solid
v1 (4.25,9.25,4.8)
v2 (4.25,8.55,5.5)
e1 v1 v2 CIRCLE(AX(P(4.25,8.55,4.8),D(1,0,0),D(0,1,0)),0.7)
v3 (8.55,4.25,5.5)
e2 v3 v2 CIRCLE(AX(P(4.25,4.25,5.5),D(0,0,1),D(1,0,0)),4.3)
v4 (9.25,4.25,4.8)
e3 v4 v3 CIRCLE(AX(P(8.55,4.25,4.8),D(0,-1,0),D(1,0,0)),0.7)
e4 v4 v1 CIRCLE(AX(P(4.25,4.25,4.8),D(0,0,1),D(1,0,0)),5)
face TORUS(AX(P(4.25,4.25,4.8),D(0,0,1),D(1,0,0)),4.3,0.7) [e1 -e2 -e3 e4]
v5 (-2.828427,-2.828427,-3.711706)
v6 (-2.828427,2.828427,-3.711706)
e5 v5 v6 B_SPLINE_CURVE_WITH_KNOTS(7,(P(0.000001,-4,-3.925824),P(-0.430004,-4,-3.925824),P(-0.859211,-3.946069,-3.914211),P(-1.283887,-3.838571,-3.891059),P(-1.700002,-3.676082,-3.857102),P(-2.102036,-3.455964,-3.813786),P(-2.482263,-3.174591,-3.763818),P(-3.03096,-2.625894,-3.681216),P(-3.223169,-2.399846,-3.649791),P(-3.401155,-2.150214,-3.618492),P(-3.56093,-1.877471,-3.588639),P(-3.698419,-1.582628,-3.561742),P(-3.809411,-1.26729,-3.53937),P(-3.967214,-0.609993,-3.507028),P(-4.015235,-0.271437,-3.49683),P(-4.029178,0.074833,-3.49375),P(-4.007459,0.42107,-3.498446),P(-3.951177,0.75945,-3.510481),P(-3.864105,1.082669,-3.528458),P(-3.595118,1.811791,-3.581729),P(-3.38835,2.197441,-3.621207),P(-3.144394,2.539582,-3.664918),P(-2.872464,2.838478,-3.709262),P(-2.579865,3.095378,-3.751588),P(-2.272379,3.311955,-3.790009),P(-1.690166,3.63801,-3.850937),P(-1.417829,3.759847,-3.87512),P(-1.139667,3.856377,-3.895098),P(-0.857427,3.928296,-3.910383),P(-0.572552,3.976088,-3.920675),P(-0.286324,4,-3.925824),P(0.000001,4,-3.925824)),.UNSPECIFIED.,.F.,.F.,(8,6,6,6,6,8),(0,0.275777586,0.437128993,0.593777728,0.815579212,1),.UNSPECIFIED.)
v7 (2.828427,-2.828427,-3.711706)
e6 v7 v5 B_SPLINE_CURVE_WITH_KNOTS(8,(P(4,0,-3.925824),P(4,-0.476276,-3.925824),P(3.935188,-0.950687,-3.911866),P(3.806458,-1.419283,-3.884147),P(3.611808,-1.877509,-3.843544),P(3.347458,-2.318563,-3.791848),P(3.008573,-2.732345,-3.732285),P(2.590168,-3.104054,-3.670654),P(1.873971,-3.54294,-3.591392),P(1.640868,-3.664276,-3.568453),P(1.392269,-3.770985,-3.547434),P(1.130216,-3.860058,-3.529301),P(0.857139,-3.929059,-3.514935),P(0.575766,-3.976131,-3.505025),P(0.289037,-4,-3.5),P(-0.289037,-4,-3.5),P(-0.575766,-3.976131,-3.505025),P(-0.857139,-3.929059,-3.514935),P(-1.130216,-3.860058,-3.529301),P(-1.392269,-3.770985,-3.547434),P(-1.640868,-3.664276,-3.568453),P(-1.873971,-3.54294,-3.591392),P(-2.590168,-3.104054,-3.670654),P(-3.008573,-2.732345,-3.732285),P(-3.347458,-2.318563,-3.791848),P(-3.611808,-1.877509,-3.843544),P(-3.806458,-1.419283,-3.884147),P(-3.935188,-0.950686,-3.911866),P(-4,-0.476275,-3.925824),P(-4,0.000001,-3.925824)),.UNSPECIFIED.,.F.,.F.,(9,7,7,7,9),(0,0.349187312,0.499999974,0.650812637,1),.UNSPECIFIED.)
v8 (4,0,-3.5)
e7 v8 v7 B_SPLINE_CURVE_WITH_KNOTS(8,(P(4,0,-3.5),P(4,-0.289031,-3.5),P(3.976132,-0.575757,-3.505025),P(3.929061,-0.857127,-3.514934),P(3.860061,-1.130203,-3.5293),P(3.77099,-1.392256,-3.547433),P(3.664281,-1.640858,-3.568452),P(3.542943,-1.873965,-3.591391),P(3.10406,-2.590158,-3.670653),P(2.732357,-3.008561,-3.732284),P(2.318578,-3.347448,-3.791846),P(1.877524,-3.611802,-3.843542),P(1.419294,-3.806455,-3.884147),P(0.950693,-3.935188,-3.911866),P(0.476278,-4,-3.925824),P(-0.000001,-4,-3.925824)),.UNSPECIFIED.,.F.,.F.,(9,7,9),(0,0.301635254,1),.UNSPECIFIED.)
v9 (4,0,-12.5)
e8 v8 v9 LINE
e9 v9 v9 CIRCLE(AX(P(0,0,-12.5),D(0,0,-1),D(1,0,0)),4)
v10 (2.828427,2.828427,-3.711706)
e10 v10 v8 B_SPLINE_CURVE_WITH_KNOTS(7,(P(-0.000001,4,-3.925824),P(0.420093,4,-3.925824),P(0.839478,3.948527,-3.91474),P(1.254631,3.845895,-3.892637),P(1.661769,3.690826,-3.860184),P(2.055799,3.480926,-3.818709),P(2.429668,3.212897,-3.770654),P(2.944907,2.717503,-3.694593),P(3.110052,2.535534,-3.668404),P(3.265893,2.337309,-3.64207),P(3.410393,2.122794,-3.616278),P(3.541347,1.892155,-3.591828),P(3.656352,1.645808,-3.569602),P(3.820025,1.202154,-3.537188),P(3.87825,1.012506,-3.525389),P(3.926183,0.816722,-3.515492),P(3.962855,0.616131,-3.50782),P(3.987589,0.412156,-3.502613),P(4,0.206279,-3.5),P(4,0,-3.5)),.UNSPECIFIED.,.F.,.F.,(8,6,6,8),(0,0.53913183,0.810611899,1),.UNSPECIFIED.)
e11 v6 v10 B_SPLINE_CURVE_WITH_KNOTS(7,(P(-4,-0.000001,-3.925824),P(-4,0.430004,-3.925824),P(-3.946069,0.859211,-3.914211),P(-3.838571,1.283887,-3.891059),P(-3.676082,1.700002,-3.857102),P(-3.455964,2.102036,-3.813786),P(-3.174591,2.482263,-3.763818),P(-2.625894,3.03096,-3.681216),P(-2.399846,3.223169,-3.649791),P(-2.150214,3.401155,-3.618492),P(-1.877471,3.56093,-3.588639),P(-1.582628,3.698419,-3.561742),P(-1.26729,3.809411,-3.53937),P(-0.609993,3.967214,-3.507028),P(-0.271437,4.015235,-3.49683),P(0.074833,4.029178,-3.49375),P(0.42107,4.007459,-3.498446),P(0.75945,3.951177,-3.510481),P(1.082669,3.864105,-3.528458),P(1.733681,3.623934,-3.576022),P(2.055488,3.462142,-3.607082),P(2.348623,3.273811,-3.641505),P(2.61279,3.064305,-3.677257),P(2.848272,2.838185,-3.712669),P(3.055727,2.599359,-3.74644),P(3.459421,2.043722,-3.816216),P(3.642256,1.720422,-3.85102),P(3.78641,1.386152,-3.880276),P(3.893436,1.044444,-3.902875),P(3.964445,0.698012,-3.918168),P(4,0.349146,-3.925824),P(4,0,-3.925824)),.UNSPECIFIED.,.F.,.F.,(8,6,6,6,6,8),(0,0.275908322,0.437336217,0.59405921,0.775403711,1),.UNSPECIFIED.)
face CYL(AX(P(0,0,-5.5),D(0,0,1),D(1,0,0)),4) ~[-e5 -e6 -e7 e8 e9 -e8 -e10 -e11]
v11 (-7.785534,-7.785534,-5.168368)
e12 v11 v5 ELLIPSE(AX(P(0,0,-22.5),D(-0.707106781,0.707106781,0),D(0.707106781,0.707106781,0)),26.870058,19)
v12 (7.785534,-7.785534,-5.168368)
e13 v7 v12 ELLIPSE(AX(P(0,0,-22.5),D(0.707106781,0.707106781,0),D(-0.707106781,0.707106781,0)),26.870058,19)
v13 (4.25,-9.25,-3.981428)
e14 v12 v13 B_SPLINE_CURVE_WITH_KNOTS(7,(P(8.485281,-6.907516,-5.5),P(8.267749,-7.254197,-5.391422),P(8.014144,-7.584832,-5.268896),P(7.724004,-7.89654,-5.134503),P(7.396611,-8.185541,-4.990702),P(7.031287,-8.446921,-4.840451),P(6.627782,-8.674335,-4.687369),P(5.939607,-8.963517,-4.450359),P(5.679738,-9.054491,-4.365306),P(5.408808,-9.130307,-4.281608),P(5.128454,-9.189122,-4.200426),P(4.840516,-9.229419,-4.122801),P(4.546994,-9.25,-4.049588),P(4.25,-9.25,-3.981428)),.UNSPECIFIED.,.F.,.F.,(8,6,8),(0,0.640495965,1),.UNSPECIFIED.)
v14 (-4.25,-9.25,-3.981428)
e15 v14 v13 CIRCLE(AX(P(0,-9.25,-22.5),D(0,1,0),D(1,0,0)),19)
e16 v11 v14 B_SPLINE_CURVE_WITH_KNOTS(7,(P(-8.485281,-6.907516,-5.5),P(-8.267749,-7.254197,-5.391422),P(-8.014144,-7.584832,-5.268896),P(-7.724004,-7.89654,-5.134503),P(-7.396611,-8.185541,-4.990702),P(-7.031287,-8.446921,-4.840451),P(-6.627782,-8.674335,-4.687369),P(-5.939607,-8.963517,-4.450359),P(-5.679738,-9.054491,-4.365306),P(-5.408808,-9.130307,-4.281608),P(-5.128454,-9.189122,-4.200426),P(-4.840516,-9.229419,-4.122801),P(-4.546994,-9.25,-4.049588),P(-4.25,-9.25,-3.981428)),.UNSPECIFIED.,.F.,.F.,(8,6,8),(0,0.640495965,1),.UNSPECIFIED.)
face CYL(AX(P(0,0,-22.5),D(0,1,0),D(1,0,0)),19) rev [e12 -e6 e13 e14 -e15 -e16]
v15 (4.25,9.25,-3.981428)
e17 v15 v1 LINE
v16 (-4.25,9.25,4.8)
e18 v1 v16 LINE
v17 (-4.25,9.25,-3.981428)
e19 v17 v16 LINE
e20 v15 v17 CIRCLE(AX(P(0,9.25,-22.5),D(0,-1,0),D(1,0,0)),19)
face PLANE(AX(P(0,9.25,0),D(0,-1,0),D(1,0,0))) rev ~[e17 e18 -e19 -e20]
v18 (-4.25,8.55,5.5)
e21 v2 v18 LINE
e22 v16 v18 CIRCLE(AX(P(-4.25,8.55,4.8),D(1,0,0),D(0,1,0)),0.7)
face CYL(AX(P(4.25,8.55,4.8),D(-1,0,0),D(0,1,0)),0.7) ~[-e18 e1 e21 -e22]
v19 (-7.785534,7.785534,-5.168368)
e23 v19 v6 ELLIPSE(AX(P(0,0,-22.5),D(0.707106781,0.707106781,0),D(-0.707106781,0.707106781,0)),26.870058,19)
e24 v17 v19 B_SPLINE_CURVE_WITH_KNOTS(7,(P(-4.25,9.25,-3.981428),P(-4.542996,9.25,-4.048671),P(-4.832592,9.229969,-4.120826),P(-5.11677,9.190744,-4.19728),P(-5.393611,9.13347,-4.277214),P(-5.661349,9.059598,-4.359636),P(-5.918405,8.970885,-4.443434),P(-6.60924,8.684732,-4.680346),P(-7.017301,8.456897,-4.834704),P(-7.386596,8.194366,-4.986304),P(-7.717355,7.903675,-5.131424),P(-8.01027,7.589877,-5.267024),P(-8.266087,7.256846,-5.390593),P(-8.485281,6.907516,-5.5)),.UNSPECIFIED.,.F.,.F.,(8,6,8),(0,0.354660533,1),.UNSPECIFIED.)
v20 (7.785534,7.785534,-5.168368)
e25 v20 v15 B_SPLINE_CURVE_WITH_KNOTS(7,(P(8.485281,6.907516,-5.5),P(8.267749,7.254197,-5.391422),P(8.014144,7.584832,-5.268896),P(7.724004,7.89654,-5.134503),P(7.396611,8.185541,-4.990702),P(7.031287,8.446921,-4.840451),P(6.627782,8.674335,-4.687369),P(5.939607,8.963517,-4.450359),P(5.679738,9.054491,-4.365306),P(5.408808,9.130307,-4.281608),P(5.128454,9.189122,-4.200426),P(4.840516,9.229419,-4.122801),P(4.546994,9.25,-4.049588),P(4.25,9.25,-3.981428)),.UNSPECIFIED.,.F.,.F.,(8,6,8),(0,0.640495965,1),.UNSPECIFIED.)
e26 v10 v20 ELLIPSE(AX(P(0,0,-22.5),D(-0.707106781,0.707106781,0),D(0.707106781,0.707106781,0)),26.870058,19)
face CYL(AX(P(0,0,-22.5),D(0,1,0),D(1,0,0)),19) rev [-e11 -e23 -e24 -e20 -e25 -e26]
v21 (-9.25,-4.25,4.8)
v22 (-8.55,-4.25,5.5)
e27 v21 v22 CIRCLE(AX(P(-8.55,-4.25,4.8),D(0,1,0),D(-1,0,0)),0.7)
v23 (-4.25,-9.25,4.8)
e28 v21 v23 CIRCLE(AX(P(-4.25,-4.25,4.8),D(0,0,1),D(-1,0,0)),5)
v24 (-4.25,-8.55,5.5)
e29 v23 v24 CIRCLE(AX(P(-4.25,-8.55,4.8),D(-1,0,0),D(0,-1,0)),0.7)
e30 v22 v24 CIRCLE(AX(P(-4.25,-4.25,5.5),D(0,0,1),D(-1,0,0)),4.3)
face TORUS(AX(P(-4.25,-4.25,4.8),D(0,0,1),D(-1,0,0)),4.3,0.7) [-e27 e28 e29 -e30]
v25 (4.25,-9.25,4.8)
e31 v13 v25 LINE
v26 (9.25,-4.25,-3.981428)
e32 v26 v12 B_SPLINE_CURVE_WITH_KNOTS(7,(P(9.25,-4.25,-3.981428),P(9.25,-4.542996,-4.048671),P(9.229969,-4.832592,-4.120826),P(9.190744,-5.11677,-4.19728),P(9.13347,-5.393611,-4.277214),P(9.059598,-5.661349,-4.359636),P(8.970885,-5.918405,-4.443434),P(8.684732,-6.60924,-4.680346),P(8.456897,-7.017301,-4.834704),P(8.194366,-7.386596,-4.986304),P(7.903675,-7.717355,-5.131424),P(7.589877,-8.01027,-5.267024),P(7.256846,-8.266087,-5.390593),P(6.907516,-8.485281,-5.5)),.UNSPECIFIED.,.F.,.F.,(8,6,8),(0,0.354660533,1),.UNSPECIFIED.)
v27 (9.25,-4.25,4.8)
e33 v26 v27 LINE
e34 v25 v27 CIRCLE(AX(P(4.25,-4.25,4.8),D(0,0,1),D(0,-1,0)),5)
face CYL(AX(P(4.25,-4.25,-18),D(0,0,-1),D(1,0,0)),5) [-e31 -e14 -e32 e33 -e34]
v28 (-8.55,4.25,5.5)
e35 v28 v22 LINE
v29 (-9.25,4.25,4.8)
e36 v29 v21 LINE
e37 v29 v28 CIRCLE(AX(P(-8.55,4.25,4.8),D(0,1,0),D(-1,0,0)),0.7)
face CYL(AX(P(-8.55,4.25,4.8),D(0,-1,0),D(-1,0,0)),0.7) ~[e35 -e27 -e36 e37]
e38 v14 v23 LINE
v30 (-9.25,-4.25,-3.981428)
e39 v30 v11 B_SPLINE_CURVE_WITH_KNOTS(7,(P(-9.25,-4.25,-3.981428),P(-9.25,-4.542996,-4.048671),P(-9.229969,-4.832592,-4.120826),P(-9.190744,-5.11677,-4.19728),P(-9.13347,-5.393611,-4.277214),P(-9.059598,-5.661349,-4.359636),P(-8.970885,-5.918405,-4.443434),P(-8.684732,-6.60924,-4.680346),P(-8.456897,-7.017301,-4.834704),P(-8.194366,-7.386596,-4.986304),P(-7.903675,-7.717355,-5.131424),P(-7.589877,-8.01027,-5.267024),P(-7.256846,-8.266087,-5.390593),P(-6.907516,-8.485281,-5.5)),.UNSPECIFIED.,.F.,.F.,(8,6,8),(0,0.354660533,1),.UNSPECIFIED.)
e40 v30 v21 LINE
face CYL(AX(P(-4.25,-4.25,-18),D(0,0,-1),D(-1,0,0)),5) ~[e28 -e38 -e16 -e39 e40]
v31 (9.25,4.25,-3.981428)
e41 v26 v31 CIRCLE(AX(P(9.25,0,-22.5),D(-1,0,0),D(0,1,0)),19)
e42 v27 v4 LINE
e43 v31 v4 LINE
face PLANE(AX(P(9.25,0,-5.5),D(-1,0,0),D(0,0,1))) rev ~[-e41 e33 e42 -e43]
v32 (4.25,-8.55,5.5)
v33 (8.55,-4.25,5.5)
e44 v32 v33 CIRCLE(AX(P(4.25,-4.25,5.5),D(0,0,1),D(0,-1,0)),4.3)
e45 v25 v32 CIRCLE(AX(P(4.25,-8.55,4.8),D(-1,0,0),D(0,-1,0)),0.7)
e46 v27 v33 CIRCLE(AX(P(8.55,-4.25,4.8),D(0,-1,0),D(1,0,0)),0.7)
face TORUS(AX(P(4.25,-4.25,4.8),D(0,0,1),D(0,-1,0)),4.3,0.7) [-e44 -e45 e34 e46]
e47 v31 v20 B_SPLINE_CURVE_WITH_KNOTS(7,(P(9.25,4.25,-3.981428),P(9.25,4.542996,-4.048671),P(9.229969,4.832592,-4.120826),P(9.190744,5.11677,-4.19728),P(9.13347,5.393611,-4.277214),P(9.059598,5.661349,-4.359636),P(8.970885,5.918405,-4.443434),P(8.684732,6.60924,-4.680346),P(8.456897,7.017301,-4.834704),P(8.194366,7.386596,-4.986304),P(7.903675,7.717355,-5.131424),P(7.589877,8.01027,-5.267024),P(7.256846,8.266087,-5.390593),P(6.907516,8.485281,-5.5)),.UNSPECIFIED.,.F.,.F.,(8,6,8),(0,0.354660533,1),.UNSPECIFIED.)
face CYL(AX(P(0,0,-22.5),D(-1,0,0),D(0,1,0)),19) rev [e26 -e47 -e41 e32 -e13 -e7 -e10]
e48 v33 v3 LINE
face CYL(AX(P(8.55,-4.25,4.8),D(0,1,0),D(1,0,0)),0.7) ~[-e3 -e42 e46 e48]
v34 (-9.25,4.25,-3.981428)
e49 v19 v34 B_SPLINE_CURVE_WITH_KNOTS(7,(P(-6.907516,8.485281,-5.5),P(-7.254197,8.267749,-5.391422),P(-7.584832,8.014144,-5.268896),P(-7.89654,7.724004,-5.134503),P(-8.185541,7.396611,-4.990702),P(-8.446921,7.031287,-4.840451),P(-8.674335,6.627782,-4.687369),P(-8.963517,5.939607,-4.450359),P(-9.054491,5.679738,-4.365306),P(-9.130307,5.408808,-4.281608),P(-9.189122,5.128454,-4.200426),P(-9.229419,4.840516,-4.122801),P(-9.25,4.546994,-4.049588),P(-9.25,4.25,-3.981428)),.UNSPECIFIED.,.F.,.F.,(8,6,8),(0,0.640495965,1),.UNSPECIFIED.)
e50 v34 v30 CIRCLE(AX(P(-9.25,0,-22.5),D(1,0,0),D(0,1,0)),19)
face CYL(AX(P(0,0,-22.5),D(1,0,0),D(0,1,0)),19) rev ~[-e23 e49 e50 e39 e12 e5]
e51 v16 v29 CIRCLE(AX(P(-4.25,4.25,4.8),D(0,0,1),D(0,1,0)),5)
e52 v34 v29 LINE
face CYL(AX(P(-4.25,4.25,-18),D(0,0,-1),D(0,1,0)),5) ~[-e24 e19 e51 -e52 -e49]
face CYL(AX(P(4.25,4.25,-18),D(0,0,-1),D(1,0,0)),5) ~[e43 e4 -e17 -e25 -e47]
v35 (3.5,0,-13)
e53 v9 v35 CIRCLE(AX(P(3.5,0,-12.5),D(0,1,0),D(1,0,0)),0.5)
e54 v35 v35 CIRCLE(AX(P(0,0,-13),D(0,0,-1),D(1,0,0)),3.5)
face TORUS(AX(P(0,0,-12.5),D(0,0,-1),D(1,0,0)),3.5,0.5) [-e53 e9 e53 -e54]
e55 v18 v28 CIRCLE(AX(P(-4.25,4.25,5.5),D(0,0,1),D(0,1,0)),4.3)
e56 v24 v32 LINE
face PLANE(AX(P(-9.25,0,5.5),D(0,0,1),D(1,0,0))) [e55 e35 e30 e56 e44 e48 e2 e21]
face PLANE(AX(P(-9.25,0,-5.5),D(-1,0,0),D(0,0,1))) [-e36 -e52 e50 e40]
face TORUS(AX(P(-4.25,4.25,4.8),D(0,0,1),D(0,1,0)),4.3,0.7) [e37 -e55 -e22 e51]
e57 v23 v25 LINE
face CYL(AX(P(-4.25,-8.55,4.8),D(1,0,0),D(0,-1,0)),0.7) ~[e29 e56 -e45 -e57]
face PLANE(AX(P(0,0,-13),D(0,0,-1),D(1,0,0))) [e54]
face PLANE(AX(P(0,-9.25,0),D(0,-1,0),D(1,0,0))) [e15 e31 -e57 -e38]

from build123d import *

# Parameters (mm, degrees)
F0_W         = 18.5
F0_H         = 11
F1_DEPTH     = 9.25
F2_DEPTH     = 9.25
F3_R         = 19
F5_DEPTH     = 25.4
F6_DEPTH     = 25.4
F4_R         = 19
F7_DEPTH     = 25.4
F8_DEPTH     = 25.4
F9_R         = 4
F10_DEPTH    = 3.45753
F11_DEPTH    = 7.5
F12_T1_DEPTH = 36
F13_R        = 0.7
F14_R        = 0.5


# Not quite as in the source:
# - a fillet or chamfer that OpenCascade refuses, or shapes differently, is made with other operations: its cross-section is extruded or revolved along the edge and cut away or added
# - a feature names something its author has since deleted; it is built from what else it names


with BuildPart() as f1:
    # F0 (on Front) → F1 (new body)
    with BuildSketch(Plane.XZ):
        Rectangle(F0_W, F0_H)
    extrude(amount=-F1_DEPTH)

    # F0 (on Front) → F2 (join)
    with BuildSketch(Plane.XZ):
        Rectangle(F0_W, F0_H)
    extrude(amount=F2_DEPTH)

    # F3 (on Front) → F5 (cut)
    with BuildSketch(Plane.XZ):
        with Locations((0, -22.5)):
            Circle(F3_R)
    extrude(amount=-F5_DEPTH, mode=Mode.SUBTRACT)

    # F3 (on Front) → F6 (cut)
    with BuildSketch(Plane.XZ):
        with Locations((0, -22.5)):
            Circle(F3_R)
    extrude(amount=F6_DEPTH, mode=Mode.SUBTRACT)

    # F4 (on Right) → F7 (cut)
    with BuildSketch(Plane.YZ):
        with Locations((0, -22.5)):
            Circle(F4_R)
    extrude(amount=-F7_DEPTH, mode=Mode.SUBTRACT)

    # F4 (on Right) → F8 (cut)
    with BuildSketch(Plane.YZ):
        with Locations((0, -22.5)):
            Circle(F4_R)
    extrude(amount=F8_DEPTH, mode=Mode.SUBTRACT)

    # F9 (on face) → F10 (join)
    with BuildSketch(Plane(origin=(0, 0, -5.5), x_dir=(1, 0, 0), z_dir=(0, 0, -1))):
        Circle(F9_R)
    extrude(amount=-F10_DEPTH)

    # F11 (add): a face of the model
    f11_faces = [f1.faces().sort_by_distance(p)[0] for p in [
        (0, 0, -5.5),
    ]]
    extrude(f11_faces, amount=F11_DEPTH)

    # F12: fillet of radius 5 on 4 edges, made by hand

    # F12_s2 → F12_t1 (cut)
    with BuildSketch(Plane.XY.offset(-18)):
        with BuildLine():
            ThreePointArc((-9.25, -4.25), (-7.7855339059, -7.7855339059), (-4.25, -9.25))
            Line((-4.25, -9.25), (-9.25, -9.25))
            Line((-9.25, -9.25), (-9.25, -4.25))
        make_face()
        with BuildLine():
            ThreePointArc((-4.25, 9.25), (-7.7855339059, 7.7855339059), (-9.25, 4.25))
            Line((-9.25, 4.25), (-9.25, 9.25))
            Line((-9.25, 9.25), (-4.25, 9.25))
        make_face()
        with BuildLine():
            ThreePointArc((9.25, 4.25), (7.7855339059, 7.7855339059), (4.25, 9.25))
            Line((4.25, 9.25), (9.25, 9.25))
            Line((9.25, 9.25), (9.25, 4.25))
        make_face()
        with BuildLine():
            ThreePointArc((9.25, -4.25), (7.7855339059, -7.7855339059), (4.25, -9.25))
            Line((4.25, -9.25), (9.25, -9.25))
            Line((9.25, -9.25), (9.25, -4.25))
        make_face()
    extrude(amount=F12_T1_DEPTH, mode=Mode.SUBTRACT)

    # F13
    f13_edges = [f1.edges().sort_by_distance(p)[0] for p in [
        (9.25, 0, 5.5),
        (7.785534, -7.785534, 5.5),
        (0, -9.25, 5.5),
        (-7.785534, -7.785534, 5.5),
        (-9.25, 0, 5.5),
        (-7.785534, 7.785534, 5.5),
        (0, 9.25, 5.5),
        (7.785534, 7.785534, 5.5),
    ]]
    fillet(f13_edges, radius=F13_R)

    # F14
    f14_edges = [f1.edges().sort_by_distance(p)[0] for p in [
        (-4, 0, -13),
    ]]
    fillet(f14_edges, radius=F14_R)


solid = f1.part
